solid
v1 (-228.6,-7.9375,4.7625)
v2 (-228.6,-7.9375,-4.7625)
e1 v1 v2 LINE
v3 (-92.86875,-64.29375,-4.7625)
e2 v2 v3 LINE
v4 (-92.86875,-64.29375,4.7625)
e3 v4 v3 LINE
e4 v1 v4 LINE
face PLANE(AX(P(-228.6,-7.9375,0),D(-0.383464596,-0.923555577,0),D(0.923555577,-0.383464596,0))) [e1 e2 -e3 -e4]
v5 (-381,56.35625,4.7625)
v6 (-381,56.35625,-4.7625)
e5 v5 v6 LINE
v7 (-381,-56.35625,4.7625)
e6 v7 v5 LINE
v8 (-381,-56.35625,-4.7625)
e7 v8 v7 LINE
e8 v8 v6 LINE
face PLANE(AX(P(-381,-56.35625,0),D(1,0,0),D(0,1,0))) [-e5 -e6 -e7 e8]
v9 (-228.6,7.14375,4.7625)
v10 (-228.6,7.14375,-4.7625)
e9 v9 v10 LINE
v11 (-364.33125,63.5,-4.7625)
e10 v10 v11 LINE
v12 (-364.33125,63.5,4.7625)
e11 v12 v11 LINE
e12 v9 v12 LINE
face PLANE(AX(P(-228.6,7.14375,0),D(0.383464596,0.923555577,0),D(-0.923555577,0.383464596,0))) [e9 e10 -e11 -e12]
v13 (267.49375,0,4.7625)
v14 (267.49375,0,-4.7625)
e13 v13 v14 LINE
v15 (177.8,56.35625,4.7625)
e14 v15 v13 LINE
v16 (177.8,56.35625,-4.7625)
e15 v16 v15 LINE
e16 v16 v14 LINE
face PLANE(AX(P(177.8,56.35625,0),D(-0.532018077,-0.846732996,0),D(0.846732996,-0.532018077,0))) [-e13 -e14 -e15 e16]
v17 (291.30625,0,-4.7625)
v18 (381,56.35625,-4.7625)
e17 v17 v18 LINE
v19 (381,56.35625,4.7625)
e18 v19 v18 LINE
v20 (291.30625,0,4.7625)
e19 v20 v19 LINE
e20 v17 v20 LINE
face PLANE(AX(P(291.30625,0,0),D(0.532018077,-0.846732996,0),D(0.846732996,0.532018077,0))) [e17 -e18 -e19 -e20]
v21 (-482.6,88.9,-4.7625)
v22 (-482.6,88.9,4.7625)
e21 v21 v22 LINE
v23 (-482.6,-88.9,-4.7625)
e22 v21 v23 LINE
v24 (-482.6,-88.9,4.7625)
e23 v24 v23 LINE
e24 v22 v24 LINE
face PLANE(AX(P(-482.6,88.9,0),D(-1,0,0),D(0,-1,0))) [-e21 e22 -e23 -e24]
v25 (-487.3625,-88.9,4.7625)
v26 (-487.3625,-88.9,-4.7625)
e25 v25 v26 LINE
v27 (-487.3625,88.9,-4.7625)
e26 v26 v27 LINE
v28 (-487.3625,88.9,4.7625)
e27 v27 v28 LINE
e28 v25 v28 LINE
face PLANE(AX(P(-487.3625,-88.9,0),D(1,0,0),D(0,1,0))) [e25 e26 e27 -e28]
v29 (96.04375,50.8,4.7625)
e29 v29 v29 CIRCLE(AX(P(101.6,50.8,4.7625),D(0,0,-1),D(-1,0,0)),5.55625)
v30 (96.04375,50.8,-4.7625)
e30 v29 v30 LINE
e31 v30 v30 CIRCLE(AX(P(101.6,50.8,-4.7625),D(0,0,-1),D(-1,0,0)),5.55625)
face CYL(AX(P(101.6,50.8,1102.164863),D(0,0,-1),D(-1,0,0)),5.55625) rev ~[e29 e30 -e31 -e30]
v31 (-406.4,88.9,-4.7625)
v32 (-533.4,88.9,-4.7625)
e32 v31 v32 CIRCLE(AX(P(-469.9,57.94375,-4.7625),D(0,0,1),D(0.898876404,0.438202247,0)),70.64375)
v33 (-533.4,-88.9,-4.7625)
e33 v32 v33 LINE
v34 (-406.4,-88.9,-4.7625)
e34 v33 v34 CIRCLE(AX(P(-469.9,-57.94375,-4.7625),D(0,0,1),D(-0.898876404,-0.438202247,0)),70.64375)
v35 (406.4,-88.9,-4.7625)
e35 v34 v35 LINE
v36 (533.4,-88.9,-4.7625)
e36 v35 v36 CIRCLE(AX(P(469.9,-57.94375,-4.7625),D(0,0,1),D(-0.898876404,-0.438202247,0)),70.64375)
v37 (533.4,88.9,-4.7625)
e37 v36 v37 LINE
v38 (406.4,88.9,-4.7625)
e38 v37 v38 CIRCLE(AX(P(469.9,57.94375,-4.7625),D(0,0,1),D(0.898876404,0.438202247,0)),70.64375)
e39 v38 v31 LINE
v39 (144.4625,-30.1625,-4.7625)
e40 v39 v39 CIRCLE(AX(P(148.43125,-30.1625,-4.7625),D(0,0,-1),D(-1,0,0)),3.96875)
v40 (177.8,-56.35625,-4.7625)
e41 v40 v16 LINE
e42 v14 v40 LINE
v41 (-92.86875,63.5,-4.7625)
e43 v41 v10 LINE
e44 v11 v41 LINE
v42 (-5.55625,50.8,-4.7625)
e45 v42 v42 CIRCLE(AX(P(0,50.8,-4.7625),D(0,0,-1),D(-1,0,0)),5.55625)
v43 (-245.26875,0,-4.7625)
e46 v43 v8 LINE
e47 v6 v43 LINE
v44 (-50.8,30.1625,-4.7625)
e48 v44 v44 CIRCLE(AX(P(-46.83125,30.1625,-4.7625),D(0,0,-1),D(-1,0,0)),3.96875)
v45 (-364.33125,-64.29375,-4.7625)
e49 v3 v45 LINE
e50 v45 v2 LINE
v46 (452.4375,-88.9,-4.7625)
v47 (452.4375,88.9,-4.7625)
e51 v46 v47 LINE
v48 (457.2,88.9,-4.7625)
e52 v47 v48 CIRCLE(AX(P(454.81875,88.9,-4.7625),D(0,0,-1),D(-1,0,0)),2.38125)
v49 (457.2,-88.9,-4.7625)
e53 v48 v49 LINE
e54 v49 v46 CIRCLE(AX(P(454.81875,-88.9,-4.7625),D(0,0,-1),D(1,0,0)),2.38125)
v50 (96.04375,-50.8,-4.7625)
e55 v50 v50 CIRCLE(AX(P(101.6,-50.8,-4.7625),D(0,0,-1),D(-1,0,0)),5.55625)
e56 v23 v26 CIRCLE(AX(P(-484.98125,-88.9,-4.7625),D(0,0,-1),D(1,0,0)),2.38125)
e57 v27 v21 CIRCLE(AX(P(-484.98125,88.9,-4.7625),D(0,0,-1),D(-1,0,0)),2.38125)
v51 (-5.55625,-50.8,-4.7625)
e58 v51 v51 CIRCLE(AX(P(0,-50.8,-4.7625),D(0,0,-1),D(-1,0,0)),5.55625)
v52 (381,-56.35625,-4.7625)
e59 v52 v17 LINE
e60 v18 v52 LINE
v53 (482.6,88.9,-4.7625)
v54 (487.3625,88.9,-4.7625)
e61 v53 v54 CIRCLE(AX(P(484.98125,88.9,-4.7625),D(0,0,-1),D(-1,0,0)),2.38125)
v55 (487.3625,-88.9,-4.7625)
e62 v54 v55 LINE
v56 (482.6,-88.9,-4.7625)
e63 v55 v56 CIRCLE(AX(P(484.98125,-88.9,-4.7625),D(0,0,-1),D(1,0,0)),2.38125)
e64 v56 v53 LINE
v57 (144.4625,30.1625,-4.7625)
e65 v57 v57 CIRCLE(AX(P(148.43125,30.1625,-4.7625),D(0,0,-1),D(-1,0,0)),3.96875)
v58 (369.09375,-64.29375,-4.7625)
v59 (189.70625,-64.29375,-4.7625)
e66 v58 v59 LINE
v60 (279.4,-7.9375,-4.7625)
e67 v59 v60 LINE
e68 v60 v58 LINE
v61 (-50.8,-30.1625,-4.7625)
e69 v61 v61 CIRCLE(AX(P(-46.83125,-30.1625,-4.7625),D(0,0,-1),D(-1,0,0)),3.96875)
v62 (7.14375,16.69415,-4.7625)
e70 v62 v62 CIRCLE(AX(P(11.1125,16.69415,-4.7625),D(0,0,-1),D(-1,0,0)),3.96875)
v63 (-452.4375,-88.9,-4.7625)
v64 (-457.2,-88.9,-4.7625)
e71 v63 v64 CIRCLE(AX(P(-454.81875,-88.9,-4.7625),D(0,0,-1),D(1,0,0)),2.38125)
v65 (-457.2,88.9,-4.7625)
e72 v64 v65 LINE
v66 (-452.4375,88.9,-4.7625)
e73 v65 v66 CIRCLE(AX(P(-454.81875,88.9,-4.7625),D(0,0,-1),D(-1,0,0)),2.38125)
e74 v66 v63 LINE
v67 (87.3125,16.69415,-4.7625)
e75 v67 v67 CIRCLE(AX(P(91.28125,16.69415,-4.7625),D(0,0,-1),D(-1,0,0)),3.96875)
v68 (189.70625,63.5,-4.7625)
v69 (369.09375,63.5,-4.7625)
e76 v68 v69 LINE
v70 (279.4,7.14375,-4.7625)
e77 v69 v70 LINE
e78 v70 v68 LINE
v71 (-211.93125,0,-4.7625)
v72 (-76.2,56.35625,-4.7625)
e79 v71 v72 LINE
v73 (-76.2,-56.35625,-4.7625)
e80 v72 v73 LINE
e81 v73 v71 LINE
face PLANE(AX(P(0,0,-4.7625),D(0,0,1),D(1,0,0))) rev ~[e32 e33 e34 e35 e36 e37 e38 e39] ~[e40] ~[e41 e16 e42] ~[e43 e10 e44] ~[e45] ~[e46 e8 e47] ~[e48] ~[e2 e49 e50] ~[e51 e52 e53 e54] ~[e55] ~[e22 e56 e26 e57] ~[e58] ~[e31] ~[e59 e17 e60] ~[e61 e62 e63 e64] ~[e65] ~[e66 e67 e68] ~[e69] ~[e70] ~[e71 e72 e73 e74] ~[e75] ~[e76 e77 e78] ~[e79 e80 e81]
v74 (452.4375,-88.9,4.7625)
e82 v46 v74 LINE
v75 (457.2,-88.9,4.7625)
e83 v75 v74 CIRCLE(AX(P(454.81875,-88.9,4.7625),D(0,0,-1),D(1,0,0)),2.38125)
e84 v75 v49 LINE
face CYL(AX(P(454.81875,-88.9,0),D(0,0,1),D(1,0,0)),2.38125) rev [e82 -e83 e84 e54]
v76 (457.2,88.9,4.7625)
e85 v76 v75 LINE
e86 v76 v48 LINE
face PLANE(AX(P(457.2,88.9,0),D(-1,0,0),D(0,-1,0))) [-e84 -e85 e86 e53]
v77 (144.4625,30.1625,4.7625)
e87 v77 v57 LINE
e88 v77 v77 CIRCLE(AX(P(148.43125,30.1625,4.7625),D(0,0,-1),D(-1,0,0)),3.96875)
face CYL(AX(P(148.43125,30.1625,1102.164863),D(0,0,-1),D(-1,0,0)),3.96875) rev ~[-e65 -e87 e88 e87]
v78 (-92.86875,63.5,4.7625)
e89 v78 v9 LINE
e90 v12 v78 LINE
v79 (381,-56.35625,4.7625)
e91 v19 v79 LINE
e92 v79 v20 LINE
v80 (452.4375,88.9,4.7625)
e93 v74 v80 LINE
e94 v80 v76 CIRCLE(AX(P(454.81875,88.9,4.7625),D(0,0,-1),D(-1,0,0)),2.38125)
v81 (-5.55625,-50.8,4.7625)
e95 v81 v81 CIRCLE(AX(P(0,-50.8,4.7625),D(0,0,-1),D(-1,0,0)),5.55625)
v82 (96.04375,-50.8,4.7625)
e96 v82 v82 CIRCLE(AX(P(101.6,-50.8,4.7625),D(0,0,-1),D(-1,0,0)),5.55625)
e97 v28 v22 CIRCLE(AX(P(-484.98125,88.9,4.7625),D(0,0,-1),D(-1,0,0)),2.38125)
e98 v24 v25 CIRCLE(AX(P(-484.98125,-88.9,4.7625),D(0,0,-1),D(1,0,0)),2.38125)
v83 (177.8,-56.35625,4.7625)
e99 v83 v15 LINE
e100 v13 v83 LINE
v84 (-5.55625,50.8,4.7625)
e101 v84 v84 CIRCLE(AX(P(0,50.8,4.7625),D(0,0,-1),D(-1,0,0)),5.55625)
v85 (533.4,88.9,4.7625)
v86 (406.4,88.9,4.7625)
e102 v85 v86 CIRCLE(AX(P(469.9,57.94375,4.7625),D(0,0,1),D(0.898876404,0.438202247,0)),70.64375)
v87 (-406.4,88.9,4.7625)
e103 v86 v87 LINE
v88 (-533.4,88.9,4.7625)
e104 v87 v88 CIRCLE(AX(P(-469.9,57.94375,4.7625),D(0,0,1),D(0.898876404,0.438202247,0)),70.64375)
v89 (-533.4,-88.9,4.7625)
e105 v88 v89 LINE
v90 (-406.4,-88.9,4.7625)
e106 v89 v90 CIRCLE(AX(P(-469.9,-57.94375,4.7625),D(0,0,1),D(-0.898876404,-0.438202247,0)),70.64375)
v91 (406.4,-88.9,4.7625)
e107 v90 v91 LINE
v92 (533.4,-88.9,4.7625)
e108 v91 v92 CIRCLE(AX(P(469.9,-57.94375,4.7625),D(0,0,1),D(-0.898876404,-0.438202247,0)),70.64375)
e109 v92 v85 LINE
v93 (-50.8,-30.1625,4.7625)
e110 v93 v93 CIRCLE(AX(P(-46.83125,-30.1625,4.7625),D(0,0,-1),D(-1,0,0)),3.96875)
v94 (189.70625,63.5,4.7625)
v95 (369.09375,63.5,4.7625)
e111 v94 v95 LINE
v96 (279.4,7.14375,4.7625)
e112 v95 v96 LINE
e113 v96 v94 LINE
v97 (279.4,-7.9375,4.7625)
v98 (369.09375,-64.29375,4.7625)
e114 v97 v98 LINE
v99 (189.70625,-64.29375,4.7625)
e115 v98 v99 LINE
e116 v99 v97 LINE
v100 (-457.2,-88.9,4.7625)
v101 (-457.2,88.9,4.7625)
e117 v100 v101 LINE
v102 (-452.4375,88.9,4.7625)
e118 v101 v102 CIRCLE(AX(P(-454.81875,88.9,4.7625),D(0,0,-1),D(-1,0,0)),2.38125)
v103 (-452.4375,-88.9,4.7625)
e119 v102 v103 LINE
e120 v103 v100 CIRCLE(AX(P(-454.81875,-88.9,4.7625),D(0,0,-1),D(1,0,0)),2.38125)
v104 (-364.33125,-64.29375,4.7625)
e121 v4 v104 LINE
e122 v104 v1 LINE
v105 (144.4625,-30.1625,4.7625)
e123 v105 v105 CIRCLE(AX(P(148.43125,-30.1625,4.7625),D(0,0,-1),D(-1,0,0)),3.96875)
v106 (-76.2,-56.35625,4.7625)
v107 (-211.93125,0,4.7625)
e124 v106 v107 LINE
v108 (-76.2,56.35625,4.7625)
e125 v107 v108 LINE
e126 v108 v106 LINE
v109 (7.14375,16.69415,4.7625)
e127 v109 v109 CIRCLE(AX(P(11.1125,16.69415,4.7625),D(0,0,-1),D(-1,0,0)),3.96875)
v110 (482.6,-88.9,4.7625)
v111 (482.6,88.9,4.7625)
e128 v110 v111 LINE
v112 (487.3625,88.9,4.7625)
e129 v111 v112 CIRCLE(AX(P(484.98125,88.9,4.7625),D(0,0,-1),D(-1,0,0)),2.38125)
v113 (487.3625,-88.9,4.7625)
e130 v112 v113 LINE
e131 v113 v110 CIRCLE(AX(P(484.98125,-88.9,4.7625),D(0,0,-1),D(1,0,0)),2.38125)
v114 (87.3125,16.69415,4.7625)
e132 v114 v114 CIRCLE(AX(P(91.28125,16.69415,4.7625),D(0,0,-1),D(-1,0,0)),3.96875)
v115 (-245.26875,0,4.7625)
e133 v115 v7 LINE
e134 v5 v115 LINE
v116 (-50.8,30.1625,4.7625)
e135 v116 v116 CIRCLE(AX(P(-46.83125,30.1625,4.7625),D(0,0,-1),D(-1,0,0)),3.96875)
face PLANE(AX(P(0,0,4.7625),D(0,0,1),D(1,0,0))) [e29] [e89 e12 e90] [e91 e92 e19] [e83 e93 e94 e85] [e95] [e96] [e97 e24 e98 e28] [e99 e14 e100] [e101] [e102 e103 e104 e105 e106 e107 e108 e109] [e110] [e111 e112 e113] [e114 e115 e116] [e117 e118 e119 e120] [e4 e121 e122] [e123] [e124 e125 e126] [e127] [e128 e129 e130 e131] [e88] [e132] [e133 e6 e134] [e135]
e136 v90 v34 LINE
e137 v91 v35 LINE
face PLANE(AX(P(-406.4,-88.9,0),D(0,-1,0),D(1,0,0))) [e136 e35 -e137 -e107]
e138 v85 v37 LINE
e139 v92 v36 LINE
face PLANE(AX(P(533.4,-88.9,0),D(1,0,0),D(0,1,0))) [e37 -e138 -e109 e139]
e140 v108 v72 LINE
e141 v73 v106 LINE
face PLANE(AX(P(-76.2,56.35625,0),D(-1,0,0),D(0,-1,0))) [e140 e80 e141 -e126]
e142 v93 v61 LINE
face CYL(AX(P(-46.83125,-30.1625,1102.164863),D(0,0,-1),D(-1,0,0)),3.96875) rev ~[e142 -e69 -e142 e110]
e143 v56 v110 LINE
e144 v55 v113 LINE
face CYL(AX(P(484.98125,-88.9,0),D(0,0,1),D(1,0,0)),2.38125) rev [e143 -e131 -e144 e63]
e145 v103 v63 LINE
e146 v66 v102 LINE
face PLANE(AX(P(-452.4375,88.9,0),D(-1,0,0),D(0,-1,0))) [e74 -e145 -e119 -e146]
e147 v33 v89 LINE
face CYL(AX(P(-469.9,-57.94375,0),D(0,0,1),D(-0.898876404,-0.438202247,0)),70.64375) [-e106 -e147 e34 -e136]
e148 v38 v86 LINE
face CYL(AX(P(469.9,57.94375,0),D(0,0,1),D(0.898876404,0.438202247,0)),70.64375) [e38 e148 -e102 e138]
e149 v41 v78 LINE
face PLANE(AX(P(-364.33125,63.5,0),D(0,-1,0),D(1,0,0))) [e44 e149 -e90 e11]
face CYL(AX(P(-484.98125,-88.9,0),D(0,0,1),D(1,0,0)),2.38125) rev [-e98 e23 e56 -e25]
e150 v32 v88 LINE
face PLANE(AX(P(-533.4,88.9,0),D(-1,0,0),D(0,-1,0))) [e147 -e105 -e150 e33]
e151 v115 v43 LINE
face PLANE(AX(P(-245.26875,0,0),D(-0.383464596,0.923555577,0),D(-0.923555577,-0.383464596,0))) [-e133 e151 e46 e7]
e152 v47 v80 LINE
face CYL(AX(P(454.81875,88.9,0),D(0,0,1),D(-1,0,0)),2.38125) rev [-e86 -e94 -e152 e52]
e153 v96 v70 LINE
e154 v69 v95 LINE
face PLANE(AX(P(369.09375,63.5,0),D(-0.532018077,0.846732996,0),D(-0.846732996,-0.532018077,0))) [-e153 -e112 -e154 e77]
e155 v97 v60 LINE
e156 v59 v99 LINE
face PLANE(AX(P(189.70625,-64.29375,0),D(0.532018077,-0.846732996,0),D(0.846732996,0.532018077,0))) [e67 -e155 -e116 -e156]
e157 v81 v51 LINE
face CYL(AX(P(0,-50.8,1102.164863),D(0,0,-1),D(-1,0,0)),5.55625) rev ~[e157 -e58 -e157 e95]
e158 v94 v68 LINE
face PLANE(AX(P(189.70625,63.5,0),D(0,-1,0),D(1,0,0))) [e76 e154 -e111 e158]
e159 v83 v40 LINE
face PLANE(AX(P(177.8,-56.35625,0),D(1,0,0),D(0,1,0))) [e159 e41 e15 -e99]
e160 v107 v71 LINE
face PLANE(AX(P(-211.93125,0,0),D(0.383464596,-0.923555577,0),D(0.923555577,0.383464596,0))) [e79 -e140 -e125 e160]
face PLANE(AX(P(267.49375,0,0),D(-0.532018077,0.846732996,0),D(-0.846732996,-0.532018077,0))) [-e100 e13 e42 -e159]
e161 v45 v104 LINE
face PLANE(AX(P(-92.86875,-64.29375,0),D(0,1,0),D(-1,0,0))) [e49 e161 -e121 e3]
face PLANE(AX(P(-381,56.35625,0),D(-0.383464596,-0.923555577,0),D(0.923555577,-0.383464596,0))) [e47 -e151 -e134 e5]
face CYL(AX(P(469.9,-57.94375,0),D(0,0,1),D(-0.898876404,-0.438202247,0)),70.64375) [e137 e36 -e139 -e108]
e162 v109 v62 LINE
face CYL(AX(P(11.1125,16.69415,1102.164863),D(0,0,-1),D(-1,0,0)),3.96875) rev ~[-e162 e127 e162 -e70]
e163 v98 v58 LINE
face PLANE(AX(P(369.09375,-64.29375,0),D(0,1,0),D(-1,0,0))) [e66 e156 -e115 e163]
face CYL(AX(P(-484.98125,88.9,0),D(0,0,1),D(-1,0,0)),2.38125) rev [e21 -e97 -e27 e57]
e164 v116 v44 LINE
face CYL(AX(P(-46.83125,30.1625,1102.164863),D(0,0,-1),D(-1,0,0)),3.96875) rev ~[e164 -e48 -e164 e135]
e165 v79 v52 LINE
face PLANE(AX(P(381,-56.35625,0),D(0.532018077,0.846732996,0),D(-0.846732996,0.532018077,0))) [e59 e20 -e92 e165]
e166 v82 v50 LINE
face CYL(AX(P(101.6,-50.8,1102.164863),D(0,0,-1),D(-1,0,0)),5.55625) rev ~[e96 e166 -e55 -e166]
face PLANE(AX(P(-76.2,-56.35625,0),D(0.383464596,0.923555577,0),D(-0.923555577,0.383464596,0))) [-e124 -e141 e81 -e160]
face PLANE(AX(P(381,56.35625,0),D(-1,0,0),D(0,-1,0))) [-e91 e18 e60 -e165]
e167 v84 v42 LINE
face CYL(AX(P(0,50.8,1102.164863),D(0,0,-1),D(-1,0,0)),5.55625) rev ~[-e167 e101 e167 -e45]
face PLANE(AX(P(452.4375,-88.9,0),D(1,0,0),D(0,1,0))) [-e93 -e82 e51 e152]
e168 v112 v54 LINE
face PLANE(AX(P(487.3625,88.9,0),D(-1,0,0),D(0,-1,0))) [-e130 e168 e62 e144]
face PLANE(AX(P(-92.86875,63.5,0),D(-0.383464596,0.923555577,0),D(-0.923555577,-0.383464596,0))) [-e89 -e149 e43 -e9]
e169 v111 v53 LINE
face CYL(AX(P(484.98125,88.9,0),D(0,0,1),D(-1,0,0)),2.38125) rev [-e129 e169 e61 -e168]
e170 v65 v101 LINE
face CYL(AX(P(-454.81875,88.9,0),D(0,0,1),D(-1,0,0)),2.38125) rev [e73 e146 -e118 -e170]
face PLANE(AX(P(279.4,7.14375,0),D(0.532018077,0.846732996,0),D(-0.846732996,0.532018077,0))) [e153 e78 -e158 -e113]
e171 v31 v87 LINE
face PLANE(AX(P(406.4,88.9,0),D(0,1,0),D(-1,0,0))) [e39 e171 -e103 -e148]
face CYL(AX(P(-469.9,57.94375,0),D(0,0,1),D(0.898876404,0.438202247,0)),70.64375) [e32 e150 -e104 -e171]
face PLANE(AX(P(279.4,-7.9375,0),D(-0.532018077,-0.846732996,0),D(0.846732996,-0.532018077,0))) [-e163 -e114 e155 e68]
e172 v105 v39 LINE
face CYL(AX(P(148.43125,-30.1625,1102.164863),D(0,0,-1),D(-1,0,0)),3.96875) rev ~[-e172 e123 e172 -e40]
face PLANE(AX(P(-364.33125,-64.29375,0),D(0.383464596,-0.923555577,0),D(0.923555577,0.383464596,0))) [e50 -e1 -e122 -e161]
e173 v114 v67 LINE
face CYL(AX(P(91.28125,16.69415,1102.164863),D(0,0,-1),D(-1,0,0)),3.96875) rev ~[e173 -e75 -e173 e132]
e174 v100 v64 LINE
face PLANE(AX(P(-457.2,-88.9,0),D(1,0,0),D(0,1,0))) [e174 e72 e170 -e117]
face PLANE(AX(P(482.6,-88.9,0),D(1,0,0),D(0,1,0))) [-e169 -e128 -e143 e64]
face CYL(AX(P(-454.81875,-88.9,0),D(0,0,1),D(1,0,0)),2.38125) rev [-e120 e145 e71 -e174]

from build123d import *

# Parameters (mm, degrees)
F1_DEPTH = 4.7625
F3_D     = 11.1125
F4_D     = 7.9375


# Not quite as in the source:
# - a length typed as a fraction of an inch, garbled in the dataset ("3 / 203.2 mm" for 3/8 in), is restored


with BuildPart() as f1:
    # F0 (on Top) → F1 (new body, symmetric)
    with BuildSketch(Plane.XY):
        with BuildLine():
            ThreePointArc((533.4, 88.9), (469.9, 128.5875), (406.4, 88.9))
            Line((406.4, 88.9), (-406.4, 88.9))
            ThreePointArc((-406.4, 88.9), (-469.9, 128.5875), (-533.4, 88.9))
            Line((-533.4, 88.9), (-533.4, -88.9))
            ThreePointArc((-533.4, -88.9), (-469.9, -128.5875), (-406.4, -88.9))
            Line((-406.4, -88.9), (406.4, -88.9))
            ThreePointArc((406.4, -88.9), (469.9, -128.5875), (533.4, -88.9))
            Line((533.4, -88.9), (533.4, 88.9))
        make_face()
        Polygon((-364.33125, -64.29375), (-228.6, -7.9375), (-92.86875, -64.29375), align=None, mode=Mode.SUBTRACT)
        Polygon((189.70625, -64.29375), (279.4, -7.9375), (369.09375, -64.29375), align=None, mode=Mode.SUBTRACT)
        with BuildLine():
            ThreePointArc((-487.3625, 88.9), (-484.98125, 91.28125), (-482.6, 88.9))
            Line((-482.6, 88.9), (-482.6, -88.9))
            ThreePointArc((-482.6, -88.9), (-484.98125, -91.28125), (-487.3625, -88.9))
            Line((-487.3625, -88.9), (-487.3625, 88.9))
        make_face(mode=Mode.SUBTRACT)
        with BuildLine():
            ThreePointArc((-457.2, 88.9), (-454.81875, 91.28125), (-452.4375, 88.9))
            Line((-452.4375, 88.9), (-452.4375, -88.9))
            ThreePointArc((-452.4375, -88.9), (-454.81875, -91.28125), (-457.2, -88.9))
            Line((-457.2, -88.9), (-457.2, 88.9))
        make_face(mode=Mode.SUBTRACT)
        Polygon((-381, -56.35625), (-381, 56.35625), (-245.26875, 0), align=None, mode=Mode.SUBTRACT)
        Polygon((-76.2, -56.35625), (-211.93125, 0), (-76.2, 56.35625), align=None, mode=Mode.SUBTRACT)
        Polygon((-92.86875, 63.5), (-228.6, 7.14375), (-364.33125, 63.5), align=None, mode=Mode.SUBTRACT)
        Polygon((177.8, 56.35625), (267.49375, 0), (177.8, -56.35625), align=None, mode=Mode.SUBTRACT)
        Polygon((291.30625, 0), (381, 56.35625), (381, -56.35625), align=None, mode=Mode.SUBTRACT)
        with BuildLine():
            Line((452.4375, -88.9), (452.4375, 88.9))
            ThreePointArc((452.4375, 88.9), (454.81875, 91.28125), (457.2, 88.9))
            Line((457.2, 88.9), (457.2, -88.9))
            ThreePointArc((457.2, -88.9), (454.81875, -91.28125), (452.4375, -88.9))
        make_face(mode=Mode.SUBTRACT)
        with BuildLine():
            ThreePointArc((487.3625, -88.9), (484.98125, -91.28125), (482.6, -88.9))
            Line((482.6, -88.9), (482.6, 88.9))
            ThreePointArc((482.6, 88.9), (484.98125, 91.28125), (487.3625, 88.9))
            Line((487.3625, 88.9), (487.3625, -88.9))
        make_face(mode=Mode.SUBTRACT)
        Polygon((369.09375, 63.5), (279.4, 7.14375), (189.70625, 63.5), align=None, mode=Mode.SUBTRACT)
    extrude(amount=F1_DEPTH, both=True)

    # F3 (through all)
    with Locations(Plane.XY.offset(4.7625)):
        with Locations((0, 50.8), (101.6, 50.8), (101.6, -50.8), (0, -50.8)):
            Hole(F3_D / 2)

    # F4 (through all)
    with Locations(Plane.XY.offset(4.7625)):
        with Locations((-46.83125, 30.1625), (-46.83125, -30.1625), (11.1125, 16.69415), (91.28125, 16.69415), (148.43125, 30.1625), (148.43125, -30.1625)):
            Hole(F4_D / 2)


solid = f1.part
